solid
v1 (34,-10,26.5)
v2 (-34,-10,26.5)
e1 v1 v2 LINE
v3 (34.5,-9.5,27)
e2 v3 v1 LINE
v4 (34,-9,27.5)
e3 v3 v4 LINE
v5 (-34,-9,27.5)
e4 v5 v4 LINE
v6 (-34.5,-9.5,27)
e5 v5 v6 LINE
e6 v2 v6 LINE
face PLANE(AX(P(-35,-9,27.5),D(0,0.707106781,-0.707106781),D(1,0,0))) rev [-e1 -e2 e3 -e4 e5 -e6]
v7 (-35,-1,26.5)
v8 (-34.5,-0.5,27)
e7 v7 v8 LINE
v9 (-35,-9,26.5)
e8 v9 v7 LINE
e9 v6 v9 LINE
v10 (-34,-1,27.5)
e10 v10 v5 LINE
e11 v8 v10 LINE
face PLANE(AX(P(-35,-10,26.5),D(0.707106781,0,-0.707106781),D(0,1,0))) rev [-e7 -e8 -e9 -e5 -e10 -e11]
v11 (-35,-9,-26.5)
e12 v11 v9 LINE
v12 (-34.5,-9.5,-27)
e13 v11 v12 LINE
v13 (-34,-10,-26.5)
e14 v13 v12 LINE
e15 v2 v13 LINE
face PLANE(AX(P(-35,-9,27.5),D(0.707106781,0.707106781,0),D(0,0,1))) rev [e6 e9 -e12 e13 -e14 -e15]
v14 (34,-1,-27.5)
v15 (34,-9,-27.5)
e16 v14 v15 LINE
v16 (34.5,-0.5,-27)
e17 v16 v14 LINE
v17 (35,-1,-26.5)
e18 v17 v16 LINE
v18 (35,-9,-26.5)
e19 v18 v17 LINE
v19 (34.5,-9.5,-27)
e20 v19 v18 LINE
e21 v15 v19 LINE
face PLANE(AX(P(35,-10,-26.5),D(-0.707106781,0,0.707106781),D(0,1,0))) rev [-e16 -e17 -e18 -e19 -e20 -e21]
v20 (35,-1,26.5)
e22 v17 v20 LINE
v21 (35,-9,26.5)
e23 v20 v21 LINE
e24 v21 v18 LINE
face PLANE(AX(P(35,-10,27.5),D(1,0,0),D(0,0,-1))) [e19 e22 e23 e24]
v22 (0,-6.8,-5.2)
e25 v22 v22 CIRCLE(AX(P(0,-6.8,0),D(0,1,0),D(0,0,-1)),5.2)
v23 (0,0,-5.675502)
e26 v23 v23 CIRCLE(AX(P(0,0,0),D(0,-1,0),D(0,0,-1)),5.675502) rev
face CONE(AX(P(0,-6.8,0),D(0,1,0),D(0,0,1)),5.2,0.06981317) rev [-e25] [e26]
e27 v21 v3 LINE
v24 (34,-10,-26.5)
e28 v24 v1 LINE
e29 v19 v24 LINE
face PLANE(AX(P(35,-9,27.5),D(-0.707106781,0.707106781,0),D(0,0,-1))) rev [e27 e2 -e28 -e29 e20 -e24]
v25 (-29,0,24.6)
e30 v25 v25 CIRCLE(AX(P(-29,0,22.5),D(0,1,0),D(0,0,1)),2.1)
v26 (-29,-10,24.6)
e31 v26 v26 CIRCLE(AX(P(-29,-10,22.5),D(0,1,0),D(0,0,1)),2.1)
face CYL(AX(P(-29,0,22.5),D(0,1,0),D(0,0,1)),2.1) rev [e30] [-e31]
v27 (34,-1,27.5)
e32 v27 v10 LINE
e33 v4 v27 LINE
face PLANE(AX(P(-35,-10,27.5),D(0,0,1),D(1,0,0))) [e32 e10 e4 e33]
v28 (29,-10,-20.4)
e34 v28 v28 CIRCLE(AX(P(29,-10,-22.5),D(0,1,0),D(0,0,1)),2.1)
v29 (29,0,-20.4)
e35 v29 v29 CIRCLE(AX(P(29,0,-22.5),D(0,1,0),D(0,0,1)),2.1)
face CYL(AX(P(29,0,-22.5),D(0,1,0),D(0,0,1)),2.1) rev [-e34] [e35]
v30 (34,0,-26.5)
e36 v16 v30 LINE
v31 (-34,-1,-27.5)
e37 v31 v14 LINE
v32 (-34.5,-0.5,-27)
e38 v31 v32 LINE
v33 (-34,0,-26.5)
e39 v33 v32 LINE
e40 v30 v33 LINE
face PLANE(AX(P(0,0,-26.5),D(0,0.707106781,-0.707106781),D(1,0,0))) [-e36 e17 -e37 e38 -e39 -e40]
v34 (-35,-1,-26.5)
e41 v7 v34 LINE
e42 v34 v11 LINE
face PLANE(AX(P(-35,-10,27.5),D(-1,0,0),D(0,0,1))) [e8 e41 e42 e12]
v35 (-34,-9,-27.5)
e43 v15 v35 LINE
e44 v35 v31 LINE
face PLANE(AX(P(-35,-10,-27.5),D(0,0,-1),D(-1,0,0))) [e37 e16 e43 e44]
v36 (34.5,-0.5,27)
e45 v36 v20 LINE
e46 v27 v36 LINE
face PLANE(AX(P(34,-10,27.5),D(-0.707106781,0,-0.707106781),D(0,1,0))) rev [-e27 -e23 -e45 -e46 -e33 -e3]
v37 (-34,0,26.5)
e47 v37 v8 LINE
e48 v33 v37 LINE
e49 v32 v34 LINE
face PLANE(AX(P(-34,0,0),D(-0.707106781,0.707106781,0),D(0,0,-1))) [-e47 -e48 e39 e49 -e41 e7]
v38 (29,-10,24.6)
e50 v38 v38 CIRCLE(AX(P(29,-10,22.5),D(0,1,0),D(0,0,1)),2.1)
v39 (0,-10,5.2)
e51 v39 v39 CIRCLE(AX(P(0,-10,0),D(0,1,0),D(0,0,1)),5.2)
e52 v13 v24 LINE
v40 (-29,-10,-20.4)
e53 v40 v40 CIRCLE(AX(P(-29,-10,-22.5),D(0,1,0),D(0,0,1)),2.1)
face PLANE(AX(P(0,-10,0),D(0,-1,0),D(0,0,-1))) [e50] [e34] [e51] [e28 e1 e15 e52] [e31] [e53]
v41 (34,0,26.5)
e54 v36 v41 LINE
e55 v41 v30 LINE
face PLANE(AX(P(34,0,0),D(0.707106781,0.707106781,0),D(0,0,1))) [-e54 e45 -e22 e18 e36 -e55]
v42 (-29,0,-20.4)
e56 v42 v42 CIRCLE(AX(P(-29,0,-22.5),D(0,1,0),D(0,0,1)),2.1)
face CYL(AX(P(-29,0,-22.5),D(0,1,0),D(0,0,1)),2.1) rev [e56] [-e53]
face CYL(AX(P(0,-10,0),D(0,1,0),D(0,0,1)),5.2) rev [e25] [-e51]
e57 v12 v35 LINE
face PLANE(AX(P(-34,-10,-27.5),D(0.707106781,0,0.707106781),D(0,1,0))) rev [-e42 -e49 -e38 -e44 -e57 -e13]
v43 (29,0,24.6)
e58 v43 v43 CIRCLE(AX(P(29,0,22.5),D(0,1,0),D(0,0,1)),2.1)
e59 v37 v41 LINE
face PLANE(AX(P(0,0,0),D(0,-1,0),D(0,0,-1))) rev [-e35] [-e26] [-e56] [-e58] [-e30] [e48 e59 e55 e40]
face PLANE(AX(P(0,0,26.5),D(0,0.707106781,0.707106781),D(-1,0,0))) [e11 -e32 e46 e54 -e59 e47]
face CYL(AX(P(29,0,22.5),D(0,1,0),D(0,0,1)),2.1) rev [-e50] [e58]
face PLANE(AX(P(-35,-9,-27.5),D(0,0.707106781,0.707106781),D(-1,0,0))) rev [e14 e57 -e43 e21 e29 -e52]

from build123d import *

# Parameters (mm, degrees)
SKETCH1_W           = 70
SKETCH1_H           = 55
BOSS_EXTRUDE1_DEPTH = 10
CHAMFER1_SIZE       = 1
SKETCH2_R           = 5.2
CUT_EXTRUDE1_DEPTH  = 46.620718977
CHAMFER2_SIZE       = 1
M5_TAPPED_HOLE1_D   = 4.2


# Read off the part's stored shape, not the designer's step: Draft1
with BuildPart() as part:
    # Sketch1 → Boss-Extrude1 (new body)
    with BuildSketch(Plane(origin=(0, 0, 0), x_dir=(1, 0, 0), z_dir=(0, 1, 0))):
        Rectangle(SKETCH1_W, SKETCH1_H)
    extrude(amount=-BOSS_EXTRUDE1_DEPTH)

    # Chamfer1
    chamfer1_edges = [part.edges().sort_by_distance(p)[0] for p in [
        (-35, -10, 0),
        (0, -10, 27.5),
        (35, -10, 0),
        (0, 0, 27.5),
        (-35, 0, 0),
        (0, 0, -27.5),
        (35, 0, 0),
        (0, -10, -27.5),
    ]]
    chamfer(chamfer1_edges, length=CHAMFER1_SIZE)

    # Sketch2 → Cut-Extrude1 (cut, through all)
    with BuildSketch(Plane(origin=(0, 0, 0), x_dir=(1, 0, 0), z_dir=(0, 1, 0))):
        with Locations(Location((0, 0, 0), (0, 0, 270))):
            Circle(SKETCH2_R)
    extrude(amount=-CUT_EXTRUDE1_DEPTH, mode=Mode.SUBTRACT)

    # Chamfer2
    chamfer2_edges = [part.edges().sort_by_distance(p)[0] for p in [
        (35, -5, -27.5),
        (-35, -5, -27.5),
        (-35, -5, 27.5),
        (35, -5, 27.5),
    ]]
    chamfer(chamfer2_edges, length=CHAMFER2_SIZE)

    # M5 Tapped Hole1 (through all)
    with Locations(Plane(origin=(0, 0, 0), x_dir=(1, 0, 0), z_dir=(0, 1, 0))):
        with Locations((-29, 22.5), (29, 22.5), (29, -22.5), (-29, -22.5)):
            Hole(M5_TAPPED_HOLE1_D / 2)

    # Draft1 outline → Draft1 (revolve, cut)
    with BuildSketch(Plane.XY):
        Polygon((5.2, 0), (5.2, -6.8), (5.675502321, 0), align=None)
    revolve(axis=Axis((0, 0, 0), (0, 1, 0)), mode=Mode.SUBTRACT)


solid = part.part
